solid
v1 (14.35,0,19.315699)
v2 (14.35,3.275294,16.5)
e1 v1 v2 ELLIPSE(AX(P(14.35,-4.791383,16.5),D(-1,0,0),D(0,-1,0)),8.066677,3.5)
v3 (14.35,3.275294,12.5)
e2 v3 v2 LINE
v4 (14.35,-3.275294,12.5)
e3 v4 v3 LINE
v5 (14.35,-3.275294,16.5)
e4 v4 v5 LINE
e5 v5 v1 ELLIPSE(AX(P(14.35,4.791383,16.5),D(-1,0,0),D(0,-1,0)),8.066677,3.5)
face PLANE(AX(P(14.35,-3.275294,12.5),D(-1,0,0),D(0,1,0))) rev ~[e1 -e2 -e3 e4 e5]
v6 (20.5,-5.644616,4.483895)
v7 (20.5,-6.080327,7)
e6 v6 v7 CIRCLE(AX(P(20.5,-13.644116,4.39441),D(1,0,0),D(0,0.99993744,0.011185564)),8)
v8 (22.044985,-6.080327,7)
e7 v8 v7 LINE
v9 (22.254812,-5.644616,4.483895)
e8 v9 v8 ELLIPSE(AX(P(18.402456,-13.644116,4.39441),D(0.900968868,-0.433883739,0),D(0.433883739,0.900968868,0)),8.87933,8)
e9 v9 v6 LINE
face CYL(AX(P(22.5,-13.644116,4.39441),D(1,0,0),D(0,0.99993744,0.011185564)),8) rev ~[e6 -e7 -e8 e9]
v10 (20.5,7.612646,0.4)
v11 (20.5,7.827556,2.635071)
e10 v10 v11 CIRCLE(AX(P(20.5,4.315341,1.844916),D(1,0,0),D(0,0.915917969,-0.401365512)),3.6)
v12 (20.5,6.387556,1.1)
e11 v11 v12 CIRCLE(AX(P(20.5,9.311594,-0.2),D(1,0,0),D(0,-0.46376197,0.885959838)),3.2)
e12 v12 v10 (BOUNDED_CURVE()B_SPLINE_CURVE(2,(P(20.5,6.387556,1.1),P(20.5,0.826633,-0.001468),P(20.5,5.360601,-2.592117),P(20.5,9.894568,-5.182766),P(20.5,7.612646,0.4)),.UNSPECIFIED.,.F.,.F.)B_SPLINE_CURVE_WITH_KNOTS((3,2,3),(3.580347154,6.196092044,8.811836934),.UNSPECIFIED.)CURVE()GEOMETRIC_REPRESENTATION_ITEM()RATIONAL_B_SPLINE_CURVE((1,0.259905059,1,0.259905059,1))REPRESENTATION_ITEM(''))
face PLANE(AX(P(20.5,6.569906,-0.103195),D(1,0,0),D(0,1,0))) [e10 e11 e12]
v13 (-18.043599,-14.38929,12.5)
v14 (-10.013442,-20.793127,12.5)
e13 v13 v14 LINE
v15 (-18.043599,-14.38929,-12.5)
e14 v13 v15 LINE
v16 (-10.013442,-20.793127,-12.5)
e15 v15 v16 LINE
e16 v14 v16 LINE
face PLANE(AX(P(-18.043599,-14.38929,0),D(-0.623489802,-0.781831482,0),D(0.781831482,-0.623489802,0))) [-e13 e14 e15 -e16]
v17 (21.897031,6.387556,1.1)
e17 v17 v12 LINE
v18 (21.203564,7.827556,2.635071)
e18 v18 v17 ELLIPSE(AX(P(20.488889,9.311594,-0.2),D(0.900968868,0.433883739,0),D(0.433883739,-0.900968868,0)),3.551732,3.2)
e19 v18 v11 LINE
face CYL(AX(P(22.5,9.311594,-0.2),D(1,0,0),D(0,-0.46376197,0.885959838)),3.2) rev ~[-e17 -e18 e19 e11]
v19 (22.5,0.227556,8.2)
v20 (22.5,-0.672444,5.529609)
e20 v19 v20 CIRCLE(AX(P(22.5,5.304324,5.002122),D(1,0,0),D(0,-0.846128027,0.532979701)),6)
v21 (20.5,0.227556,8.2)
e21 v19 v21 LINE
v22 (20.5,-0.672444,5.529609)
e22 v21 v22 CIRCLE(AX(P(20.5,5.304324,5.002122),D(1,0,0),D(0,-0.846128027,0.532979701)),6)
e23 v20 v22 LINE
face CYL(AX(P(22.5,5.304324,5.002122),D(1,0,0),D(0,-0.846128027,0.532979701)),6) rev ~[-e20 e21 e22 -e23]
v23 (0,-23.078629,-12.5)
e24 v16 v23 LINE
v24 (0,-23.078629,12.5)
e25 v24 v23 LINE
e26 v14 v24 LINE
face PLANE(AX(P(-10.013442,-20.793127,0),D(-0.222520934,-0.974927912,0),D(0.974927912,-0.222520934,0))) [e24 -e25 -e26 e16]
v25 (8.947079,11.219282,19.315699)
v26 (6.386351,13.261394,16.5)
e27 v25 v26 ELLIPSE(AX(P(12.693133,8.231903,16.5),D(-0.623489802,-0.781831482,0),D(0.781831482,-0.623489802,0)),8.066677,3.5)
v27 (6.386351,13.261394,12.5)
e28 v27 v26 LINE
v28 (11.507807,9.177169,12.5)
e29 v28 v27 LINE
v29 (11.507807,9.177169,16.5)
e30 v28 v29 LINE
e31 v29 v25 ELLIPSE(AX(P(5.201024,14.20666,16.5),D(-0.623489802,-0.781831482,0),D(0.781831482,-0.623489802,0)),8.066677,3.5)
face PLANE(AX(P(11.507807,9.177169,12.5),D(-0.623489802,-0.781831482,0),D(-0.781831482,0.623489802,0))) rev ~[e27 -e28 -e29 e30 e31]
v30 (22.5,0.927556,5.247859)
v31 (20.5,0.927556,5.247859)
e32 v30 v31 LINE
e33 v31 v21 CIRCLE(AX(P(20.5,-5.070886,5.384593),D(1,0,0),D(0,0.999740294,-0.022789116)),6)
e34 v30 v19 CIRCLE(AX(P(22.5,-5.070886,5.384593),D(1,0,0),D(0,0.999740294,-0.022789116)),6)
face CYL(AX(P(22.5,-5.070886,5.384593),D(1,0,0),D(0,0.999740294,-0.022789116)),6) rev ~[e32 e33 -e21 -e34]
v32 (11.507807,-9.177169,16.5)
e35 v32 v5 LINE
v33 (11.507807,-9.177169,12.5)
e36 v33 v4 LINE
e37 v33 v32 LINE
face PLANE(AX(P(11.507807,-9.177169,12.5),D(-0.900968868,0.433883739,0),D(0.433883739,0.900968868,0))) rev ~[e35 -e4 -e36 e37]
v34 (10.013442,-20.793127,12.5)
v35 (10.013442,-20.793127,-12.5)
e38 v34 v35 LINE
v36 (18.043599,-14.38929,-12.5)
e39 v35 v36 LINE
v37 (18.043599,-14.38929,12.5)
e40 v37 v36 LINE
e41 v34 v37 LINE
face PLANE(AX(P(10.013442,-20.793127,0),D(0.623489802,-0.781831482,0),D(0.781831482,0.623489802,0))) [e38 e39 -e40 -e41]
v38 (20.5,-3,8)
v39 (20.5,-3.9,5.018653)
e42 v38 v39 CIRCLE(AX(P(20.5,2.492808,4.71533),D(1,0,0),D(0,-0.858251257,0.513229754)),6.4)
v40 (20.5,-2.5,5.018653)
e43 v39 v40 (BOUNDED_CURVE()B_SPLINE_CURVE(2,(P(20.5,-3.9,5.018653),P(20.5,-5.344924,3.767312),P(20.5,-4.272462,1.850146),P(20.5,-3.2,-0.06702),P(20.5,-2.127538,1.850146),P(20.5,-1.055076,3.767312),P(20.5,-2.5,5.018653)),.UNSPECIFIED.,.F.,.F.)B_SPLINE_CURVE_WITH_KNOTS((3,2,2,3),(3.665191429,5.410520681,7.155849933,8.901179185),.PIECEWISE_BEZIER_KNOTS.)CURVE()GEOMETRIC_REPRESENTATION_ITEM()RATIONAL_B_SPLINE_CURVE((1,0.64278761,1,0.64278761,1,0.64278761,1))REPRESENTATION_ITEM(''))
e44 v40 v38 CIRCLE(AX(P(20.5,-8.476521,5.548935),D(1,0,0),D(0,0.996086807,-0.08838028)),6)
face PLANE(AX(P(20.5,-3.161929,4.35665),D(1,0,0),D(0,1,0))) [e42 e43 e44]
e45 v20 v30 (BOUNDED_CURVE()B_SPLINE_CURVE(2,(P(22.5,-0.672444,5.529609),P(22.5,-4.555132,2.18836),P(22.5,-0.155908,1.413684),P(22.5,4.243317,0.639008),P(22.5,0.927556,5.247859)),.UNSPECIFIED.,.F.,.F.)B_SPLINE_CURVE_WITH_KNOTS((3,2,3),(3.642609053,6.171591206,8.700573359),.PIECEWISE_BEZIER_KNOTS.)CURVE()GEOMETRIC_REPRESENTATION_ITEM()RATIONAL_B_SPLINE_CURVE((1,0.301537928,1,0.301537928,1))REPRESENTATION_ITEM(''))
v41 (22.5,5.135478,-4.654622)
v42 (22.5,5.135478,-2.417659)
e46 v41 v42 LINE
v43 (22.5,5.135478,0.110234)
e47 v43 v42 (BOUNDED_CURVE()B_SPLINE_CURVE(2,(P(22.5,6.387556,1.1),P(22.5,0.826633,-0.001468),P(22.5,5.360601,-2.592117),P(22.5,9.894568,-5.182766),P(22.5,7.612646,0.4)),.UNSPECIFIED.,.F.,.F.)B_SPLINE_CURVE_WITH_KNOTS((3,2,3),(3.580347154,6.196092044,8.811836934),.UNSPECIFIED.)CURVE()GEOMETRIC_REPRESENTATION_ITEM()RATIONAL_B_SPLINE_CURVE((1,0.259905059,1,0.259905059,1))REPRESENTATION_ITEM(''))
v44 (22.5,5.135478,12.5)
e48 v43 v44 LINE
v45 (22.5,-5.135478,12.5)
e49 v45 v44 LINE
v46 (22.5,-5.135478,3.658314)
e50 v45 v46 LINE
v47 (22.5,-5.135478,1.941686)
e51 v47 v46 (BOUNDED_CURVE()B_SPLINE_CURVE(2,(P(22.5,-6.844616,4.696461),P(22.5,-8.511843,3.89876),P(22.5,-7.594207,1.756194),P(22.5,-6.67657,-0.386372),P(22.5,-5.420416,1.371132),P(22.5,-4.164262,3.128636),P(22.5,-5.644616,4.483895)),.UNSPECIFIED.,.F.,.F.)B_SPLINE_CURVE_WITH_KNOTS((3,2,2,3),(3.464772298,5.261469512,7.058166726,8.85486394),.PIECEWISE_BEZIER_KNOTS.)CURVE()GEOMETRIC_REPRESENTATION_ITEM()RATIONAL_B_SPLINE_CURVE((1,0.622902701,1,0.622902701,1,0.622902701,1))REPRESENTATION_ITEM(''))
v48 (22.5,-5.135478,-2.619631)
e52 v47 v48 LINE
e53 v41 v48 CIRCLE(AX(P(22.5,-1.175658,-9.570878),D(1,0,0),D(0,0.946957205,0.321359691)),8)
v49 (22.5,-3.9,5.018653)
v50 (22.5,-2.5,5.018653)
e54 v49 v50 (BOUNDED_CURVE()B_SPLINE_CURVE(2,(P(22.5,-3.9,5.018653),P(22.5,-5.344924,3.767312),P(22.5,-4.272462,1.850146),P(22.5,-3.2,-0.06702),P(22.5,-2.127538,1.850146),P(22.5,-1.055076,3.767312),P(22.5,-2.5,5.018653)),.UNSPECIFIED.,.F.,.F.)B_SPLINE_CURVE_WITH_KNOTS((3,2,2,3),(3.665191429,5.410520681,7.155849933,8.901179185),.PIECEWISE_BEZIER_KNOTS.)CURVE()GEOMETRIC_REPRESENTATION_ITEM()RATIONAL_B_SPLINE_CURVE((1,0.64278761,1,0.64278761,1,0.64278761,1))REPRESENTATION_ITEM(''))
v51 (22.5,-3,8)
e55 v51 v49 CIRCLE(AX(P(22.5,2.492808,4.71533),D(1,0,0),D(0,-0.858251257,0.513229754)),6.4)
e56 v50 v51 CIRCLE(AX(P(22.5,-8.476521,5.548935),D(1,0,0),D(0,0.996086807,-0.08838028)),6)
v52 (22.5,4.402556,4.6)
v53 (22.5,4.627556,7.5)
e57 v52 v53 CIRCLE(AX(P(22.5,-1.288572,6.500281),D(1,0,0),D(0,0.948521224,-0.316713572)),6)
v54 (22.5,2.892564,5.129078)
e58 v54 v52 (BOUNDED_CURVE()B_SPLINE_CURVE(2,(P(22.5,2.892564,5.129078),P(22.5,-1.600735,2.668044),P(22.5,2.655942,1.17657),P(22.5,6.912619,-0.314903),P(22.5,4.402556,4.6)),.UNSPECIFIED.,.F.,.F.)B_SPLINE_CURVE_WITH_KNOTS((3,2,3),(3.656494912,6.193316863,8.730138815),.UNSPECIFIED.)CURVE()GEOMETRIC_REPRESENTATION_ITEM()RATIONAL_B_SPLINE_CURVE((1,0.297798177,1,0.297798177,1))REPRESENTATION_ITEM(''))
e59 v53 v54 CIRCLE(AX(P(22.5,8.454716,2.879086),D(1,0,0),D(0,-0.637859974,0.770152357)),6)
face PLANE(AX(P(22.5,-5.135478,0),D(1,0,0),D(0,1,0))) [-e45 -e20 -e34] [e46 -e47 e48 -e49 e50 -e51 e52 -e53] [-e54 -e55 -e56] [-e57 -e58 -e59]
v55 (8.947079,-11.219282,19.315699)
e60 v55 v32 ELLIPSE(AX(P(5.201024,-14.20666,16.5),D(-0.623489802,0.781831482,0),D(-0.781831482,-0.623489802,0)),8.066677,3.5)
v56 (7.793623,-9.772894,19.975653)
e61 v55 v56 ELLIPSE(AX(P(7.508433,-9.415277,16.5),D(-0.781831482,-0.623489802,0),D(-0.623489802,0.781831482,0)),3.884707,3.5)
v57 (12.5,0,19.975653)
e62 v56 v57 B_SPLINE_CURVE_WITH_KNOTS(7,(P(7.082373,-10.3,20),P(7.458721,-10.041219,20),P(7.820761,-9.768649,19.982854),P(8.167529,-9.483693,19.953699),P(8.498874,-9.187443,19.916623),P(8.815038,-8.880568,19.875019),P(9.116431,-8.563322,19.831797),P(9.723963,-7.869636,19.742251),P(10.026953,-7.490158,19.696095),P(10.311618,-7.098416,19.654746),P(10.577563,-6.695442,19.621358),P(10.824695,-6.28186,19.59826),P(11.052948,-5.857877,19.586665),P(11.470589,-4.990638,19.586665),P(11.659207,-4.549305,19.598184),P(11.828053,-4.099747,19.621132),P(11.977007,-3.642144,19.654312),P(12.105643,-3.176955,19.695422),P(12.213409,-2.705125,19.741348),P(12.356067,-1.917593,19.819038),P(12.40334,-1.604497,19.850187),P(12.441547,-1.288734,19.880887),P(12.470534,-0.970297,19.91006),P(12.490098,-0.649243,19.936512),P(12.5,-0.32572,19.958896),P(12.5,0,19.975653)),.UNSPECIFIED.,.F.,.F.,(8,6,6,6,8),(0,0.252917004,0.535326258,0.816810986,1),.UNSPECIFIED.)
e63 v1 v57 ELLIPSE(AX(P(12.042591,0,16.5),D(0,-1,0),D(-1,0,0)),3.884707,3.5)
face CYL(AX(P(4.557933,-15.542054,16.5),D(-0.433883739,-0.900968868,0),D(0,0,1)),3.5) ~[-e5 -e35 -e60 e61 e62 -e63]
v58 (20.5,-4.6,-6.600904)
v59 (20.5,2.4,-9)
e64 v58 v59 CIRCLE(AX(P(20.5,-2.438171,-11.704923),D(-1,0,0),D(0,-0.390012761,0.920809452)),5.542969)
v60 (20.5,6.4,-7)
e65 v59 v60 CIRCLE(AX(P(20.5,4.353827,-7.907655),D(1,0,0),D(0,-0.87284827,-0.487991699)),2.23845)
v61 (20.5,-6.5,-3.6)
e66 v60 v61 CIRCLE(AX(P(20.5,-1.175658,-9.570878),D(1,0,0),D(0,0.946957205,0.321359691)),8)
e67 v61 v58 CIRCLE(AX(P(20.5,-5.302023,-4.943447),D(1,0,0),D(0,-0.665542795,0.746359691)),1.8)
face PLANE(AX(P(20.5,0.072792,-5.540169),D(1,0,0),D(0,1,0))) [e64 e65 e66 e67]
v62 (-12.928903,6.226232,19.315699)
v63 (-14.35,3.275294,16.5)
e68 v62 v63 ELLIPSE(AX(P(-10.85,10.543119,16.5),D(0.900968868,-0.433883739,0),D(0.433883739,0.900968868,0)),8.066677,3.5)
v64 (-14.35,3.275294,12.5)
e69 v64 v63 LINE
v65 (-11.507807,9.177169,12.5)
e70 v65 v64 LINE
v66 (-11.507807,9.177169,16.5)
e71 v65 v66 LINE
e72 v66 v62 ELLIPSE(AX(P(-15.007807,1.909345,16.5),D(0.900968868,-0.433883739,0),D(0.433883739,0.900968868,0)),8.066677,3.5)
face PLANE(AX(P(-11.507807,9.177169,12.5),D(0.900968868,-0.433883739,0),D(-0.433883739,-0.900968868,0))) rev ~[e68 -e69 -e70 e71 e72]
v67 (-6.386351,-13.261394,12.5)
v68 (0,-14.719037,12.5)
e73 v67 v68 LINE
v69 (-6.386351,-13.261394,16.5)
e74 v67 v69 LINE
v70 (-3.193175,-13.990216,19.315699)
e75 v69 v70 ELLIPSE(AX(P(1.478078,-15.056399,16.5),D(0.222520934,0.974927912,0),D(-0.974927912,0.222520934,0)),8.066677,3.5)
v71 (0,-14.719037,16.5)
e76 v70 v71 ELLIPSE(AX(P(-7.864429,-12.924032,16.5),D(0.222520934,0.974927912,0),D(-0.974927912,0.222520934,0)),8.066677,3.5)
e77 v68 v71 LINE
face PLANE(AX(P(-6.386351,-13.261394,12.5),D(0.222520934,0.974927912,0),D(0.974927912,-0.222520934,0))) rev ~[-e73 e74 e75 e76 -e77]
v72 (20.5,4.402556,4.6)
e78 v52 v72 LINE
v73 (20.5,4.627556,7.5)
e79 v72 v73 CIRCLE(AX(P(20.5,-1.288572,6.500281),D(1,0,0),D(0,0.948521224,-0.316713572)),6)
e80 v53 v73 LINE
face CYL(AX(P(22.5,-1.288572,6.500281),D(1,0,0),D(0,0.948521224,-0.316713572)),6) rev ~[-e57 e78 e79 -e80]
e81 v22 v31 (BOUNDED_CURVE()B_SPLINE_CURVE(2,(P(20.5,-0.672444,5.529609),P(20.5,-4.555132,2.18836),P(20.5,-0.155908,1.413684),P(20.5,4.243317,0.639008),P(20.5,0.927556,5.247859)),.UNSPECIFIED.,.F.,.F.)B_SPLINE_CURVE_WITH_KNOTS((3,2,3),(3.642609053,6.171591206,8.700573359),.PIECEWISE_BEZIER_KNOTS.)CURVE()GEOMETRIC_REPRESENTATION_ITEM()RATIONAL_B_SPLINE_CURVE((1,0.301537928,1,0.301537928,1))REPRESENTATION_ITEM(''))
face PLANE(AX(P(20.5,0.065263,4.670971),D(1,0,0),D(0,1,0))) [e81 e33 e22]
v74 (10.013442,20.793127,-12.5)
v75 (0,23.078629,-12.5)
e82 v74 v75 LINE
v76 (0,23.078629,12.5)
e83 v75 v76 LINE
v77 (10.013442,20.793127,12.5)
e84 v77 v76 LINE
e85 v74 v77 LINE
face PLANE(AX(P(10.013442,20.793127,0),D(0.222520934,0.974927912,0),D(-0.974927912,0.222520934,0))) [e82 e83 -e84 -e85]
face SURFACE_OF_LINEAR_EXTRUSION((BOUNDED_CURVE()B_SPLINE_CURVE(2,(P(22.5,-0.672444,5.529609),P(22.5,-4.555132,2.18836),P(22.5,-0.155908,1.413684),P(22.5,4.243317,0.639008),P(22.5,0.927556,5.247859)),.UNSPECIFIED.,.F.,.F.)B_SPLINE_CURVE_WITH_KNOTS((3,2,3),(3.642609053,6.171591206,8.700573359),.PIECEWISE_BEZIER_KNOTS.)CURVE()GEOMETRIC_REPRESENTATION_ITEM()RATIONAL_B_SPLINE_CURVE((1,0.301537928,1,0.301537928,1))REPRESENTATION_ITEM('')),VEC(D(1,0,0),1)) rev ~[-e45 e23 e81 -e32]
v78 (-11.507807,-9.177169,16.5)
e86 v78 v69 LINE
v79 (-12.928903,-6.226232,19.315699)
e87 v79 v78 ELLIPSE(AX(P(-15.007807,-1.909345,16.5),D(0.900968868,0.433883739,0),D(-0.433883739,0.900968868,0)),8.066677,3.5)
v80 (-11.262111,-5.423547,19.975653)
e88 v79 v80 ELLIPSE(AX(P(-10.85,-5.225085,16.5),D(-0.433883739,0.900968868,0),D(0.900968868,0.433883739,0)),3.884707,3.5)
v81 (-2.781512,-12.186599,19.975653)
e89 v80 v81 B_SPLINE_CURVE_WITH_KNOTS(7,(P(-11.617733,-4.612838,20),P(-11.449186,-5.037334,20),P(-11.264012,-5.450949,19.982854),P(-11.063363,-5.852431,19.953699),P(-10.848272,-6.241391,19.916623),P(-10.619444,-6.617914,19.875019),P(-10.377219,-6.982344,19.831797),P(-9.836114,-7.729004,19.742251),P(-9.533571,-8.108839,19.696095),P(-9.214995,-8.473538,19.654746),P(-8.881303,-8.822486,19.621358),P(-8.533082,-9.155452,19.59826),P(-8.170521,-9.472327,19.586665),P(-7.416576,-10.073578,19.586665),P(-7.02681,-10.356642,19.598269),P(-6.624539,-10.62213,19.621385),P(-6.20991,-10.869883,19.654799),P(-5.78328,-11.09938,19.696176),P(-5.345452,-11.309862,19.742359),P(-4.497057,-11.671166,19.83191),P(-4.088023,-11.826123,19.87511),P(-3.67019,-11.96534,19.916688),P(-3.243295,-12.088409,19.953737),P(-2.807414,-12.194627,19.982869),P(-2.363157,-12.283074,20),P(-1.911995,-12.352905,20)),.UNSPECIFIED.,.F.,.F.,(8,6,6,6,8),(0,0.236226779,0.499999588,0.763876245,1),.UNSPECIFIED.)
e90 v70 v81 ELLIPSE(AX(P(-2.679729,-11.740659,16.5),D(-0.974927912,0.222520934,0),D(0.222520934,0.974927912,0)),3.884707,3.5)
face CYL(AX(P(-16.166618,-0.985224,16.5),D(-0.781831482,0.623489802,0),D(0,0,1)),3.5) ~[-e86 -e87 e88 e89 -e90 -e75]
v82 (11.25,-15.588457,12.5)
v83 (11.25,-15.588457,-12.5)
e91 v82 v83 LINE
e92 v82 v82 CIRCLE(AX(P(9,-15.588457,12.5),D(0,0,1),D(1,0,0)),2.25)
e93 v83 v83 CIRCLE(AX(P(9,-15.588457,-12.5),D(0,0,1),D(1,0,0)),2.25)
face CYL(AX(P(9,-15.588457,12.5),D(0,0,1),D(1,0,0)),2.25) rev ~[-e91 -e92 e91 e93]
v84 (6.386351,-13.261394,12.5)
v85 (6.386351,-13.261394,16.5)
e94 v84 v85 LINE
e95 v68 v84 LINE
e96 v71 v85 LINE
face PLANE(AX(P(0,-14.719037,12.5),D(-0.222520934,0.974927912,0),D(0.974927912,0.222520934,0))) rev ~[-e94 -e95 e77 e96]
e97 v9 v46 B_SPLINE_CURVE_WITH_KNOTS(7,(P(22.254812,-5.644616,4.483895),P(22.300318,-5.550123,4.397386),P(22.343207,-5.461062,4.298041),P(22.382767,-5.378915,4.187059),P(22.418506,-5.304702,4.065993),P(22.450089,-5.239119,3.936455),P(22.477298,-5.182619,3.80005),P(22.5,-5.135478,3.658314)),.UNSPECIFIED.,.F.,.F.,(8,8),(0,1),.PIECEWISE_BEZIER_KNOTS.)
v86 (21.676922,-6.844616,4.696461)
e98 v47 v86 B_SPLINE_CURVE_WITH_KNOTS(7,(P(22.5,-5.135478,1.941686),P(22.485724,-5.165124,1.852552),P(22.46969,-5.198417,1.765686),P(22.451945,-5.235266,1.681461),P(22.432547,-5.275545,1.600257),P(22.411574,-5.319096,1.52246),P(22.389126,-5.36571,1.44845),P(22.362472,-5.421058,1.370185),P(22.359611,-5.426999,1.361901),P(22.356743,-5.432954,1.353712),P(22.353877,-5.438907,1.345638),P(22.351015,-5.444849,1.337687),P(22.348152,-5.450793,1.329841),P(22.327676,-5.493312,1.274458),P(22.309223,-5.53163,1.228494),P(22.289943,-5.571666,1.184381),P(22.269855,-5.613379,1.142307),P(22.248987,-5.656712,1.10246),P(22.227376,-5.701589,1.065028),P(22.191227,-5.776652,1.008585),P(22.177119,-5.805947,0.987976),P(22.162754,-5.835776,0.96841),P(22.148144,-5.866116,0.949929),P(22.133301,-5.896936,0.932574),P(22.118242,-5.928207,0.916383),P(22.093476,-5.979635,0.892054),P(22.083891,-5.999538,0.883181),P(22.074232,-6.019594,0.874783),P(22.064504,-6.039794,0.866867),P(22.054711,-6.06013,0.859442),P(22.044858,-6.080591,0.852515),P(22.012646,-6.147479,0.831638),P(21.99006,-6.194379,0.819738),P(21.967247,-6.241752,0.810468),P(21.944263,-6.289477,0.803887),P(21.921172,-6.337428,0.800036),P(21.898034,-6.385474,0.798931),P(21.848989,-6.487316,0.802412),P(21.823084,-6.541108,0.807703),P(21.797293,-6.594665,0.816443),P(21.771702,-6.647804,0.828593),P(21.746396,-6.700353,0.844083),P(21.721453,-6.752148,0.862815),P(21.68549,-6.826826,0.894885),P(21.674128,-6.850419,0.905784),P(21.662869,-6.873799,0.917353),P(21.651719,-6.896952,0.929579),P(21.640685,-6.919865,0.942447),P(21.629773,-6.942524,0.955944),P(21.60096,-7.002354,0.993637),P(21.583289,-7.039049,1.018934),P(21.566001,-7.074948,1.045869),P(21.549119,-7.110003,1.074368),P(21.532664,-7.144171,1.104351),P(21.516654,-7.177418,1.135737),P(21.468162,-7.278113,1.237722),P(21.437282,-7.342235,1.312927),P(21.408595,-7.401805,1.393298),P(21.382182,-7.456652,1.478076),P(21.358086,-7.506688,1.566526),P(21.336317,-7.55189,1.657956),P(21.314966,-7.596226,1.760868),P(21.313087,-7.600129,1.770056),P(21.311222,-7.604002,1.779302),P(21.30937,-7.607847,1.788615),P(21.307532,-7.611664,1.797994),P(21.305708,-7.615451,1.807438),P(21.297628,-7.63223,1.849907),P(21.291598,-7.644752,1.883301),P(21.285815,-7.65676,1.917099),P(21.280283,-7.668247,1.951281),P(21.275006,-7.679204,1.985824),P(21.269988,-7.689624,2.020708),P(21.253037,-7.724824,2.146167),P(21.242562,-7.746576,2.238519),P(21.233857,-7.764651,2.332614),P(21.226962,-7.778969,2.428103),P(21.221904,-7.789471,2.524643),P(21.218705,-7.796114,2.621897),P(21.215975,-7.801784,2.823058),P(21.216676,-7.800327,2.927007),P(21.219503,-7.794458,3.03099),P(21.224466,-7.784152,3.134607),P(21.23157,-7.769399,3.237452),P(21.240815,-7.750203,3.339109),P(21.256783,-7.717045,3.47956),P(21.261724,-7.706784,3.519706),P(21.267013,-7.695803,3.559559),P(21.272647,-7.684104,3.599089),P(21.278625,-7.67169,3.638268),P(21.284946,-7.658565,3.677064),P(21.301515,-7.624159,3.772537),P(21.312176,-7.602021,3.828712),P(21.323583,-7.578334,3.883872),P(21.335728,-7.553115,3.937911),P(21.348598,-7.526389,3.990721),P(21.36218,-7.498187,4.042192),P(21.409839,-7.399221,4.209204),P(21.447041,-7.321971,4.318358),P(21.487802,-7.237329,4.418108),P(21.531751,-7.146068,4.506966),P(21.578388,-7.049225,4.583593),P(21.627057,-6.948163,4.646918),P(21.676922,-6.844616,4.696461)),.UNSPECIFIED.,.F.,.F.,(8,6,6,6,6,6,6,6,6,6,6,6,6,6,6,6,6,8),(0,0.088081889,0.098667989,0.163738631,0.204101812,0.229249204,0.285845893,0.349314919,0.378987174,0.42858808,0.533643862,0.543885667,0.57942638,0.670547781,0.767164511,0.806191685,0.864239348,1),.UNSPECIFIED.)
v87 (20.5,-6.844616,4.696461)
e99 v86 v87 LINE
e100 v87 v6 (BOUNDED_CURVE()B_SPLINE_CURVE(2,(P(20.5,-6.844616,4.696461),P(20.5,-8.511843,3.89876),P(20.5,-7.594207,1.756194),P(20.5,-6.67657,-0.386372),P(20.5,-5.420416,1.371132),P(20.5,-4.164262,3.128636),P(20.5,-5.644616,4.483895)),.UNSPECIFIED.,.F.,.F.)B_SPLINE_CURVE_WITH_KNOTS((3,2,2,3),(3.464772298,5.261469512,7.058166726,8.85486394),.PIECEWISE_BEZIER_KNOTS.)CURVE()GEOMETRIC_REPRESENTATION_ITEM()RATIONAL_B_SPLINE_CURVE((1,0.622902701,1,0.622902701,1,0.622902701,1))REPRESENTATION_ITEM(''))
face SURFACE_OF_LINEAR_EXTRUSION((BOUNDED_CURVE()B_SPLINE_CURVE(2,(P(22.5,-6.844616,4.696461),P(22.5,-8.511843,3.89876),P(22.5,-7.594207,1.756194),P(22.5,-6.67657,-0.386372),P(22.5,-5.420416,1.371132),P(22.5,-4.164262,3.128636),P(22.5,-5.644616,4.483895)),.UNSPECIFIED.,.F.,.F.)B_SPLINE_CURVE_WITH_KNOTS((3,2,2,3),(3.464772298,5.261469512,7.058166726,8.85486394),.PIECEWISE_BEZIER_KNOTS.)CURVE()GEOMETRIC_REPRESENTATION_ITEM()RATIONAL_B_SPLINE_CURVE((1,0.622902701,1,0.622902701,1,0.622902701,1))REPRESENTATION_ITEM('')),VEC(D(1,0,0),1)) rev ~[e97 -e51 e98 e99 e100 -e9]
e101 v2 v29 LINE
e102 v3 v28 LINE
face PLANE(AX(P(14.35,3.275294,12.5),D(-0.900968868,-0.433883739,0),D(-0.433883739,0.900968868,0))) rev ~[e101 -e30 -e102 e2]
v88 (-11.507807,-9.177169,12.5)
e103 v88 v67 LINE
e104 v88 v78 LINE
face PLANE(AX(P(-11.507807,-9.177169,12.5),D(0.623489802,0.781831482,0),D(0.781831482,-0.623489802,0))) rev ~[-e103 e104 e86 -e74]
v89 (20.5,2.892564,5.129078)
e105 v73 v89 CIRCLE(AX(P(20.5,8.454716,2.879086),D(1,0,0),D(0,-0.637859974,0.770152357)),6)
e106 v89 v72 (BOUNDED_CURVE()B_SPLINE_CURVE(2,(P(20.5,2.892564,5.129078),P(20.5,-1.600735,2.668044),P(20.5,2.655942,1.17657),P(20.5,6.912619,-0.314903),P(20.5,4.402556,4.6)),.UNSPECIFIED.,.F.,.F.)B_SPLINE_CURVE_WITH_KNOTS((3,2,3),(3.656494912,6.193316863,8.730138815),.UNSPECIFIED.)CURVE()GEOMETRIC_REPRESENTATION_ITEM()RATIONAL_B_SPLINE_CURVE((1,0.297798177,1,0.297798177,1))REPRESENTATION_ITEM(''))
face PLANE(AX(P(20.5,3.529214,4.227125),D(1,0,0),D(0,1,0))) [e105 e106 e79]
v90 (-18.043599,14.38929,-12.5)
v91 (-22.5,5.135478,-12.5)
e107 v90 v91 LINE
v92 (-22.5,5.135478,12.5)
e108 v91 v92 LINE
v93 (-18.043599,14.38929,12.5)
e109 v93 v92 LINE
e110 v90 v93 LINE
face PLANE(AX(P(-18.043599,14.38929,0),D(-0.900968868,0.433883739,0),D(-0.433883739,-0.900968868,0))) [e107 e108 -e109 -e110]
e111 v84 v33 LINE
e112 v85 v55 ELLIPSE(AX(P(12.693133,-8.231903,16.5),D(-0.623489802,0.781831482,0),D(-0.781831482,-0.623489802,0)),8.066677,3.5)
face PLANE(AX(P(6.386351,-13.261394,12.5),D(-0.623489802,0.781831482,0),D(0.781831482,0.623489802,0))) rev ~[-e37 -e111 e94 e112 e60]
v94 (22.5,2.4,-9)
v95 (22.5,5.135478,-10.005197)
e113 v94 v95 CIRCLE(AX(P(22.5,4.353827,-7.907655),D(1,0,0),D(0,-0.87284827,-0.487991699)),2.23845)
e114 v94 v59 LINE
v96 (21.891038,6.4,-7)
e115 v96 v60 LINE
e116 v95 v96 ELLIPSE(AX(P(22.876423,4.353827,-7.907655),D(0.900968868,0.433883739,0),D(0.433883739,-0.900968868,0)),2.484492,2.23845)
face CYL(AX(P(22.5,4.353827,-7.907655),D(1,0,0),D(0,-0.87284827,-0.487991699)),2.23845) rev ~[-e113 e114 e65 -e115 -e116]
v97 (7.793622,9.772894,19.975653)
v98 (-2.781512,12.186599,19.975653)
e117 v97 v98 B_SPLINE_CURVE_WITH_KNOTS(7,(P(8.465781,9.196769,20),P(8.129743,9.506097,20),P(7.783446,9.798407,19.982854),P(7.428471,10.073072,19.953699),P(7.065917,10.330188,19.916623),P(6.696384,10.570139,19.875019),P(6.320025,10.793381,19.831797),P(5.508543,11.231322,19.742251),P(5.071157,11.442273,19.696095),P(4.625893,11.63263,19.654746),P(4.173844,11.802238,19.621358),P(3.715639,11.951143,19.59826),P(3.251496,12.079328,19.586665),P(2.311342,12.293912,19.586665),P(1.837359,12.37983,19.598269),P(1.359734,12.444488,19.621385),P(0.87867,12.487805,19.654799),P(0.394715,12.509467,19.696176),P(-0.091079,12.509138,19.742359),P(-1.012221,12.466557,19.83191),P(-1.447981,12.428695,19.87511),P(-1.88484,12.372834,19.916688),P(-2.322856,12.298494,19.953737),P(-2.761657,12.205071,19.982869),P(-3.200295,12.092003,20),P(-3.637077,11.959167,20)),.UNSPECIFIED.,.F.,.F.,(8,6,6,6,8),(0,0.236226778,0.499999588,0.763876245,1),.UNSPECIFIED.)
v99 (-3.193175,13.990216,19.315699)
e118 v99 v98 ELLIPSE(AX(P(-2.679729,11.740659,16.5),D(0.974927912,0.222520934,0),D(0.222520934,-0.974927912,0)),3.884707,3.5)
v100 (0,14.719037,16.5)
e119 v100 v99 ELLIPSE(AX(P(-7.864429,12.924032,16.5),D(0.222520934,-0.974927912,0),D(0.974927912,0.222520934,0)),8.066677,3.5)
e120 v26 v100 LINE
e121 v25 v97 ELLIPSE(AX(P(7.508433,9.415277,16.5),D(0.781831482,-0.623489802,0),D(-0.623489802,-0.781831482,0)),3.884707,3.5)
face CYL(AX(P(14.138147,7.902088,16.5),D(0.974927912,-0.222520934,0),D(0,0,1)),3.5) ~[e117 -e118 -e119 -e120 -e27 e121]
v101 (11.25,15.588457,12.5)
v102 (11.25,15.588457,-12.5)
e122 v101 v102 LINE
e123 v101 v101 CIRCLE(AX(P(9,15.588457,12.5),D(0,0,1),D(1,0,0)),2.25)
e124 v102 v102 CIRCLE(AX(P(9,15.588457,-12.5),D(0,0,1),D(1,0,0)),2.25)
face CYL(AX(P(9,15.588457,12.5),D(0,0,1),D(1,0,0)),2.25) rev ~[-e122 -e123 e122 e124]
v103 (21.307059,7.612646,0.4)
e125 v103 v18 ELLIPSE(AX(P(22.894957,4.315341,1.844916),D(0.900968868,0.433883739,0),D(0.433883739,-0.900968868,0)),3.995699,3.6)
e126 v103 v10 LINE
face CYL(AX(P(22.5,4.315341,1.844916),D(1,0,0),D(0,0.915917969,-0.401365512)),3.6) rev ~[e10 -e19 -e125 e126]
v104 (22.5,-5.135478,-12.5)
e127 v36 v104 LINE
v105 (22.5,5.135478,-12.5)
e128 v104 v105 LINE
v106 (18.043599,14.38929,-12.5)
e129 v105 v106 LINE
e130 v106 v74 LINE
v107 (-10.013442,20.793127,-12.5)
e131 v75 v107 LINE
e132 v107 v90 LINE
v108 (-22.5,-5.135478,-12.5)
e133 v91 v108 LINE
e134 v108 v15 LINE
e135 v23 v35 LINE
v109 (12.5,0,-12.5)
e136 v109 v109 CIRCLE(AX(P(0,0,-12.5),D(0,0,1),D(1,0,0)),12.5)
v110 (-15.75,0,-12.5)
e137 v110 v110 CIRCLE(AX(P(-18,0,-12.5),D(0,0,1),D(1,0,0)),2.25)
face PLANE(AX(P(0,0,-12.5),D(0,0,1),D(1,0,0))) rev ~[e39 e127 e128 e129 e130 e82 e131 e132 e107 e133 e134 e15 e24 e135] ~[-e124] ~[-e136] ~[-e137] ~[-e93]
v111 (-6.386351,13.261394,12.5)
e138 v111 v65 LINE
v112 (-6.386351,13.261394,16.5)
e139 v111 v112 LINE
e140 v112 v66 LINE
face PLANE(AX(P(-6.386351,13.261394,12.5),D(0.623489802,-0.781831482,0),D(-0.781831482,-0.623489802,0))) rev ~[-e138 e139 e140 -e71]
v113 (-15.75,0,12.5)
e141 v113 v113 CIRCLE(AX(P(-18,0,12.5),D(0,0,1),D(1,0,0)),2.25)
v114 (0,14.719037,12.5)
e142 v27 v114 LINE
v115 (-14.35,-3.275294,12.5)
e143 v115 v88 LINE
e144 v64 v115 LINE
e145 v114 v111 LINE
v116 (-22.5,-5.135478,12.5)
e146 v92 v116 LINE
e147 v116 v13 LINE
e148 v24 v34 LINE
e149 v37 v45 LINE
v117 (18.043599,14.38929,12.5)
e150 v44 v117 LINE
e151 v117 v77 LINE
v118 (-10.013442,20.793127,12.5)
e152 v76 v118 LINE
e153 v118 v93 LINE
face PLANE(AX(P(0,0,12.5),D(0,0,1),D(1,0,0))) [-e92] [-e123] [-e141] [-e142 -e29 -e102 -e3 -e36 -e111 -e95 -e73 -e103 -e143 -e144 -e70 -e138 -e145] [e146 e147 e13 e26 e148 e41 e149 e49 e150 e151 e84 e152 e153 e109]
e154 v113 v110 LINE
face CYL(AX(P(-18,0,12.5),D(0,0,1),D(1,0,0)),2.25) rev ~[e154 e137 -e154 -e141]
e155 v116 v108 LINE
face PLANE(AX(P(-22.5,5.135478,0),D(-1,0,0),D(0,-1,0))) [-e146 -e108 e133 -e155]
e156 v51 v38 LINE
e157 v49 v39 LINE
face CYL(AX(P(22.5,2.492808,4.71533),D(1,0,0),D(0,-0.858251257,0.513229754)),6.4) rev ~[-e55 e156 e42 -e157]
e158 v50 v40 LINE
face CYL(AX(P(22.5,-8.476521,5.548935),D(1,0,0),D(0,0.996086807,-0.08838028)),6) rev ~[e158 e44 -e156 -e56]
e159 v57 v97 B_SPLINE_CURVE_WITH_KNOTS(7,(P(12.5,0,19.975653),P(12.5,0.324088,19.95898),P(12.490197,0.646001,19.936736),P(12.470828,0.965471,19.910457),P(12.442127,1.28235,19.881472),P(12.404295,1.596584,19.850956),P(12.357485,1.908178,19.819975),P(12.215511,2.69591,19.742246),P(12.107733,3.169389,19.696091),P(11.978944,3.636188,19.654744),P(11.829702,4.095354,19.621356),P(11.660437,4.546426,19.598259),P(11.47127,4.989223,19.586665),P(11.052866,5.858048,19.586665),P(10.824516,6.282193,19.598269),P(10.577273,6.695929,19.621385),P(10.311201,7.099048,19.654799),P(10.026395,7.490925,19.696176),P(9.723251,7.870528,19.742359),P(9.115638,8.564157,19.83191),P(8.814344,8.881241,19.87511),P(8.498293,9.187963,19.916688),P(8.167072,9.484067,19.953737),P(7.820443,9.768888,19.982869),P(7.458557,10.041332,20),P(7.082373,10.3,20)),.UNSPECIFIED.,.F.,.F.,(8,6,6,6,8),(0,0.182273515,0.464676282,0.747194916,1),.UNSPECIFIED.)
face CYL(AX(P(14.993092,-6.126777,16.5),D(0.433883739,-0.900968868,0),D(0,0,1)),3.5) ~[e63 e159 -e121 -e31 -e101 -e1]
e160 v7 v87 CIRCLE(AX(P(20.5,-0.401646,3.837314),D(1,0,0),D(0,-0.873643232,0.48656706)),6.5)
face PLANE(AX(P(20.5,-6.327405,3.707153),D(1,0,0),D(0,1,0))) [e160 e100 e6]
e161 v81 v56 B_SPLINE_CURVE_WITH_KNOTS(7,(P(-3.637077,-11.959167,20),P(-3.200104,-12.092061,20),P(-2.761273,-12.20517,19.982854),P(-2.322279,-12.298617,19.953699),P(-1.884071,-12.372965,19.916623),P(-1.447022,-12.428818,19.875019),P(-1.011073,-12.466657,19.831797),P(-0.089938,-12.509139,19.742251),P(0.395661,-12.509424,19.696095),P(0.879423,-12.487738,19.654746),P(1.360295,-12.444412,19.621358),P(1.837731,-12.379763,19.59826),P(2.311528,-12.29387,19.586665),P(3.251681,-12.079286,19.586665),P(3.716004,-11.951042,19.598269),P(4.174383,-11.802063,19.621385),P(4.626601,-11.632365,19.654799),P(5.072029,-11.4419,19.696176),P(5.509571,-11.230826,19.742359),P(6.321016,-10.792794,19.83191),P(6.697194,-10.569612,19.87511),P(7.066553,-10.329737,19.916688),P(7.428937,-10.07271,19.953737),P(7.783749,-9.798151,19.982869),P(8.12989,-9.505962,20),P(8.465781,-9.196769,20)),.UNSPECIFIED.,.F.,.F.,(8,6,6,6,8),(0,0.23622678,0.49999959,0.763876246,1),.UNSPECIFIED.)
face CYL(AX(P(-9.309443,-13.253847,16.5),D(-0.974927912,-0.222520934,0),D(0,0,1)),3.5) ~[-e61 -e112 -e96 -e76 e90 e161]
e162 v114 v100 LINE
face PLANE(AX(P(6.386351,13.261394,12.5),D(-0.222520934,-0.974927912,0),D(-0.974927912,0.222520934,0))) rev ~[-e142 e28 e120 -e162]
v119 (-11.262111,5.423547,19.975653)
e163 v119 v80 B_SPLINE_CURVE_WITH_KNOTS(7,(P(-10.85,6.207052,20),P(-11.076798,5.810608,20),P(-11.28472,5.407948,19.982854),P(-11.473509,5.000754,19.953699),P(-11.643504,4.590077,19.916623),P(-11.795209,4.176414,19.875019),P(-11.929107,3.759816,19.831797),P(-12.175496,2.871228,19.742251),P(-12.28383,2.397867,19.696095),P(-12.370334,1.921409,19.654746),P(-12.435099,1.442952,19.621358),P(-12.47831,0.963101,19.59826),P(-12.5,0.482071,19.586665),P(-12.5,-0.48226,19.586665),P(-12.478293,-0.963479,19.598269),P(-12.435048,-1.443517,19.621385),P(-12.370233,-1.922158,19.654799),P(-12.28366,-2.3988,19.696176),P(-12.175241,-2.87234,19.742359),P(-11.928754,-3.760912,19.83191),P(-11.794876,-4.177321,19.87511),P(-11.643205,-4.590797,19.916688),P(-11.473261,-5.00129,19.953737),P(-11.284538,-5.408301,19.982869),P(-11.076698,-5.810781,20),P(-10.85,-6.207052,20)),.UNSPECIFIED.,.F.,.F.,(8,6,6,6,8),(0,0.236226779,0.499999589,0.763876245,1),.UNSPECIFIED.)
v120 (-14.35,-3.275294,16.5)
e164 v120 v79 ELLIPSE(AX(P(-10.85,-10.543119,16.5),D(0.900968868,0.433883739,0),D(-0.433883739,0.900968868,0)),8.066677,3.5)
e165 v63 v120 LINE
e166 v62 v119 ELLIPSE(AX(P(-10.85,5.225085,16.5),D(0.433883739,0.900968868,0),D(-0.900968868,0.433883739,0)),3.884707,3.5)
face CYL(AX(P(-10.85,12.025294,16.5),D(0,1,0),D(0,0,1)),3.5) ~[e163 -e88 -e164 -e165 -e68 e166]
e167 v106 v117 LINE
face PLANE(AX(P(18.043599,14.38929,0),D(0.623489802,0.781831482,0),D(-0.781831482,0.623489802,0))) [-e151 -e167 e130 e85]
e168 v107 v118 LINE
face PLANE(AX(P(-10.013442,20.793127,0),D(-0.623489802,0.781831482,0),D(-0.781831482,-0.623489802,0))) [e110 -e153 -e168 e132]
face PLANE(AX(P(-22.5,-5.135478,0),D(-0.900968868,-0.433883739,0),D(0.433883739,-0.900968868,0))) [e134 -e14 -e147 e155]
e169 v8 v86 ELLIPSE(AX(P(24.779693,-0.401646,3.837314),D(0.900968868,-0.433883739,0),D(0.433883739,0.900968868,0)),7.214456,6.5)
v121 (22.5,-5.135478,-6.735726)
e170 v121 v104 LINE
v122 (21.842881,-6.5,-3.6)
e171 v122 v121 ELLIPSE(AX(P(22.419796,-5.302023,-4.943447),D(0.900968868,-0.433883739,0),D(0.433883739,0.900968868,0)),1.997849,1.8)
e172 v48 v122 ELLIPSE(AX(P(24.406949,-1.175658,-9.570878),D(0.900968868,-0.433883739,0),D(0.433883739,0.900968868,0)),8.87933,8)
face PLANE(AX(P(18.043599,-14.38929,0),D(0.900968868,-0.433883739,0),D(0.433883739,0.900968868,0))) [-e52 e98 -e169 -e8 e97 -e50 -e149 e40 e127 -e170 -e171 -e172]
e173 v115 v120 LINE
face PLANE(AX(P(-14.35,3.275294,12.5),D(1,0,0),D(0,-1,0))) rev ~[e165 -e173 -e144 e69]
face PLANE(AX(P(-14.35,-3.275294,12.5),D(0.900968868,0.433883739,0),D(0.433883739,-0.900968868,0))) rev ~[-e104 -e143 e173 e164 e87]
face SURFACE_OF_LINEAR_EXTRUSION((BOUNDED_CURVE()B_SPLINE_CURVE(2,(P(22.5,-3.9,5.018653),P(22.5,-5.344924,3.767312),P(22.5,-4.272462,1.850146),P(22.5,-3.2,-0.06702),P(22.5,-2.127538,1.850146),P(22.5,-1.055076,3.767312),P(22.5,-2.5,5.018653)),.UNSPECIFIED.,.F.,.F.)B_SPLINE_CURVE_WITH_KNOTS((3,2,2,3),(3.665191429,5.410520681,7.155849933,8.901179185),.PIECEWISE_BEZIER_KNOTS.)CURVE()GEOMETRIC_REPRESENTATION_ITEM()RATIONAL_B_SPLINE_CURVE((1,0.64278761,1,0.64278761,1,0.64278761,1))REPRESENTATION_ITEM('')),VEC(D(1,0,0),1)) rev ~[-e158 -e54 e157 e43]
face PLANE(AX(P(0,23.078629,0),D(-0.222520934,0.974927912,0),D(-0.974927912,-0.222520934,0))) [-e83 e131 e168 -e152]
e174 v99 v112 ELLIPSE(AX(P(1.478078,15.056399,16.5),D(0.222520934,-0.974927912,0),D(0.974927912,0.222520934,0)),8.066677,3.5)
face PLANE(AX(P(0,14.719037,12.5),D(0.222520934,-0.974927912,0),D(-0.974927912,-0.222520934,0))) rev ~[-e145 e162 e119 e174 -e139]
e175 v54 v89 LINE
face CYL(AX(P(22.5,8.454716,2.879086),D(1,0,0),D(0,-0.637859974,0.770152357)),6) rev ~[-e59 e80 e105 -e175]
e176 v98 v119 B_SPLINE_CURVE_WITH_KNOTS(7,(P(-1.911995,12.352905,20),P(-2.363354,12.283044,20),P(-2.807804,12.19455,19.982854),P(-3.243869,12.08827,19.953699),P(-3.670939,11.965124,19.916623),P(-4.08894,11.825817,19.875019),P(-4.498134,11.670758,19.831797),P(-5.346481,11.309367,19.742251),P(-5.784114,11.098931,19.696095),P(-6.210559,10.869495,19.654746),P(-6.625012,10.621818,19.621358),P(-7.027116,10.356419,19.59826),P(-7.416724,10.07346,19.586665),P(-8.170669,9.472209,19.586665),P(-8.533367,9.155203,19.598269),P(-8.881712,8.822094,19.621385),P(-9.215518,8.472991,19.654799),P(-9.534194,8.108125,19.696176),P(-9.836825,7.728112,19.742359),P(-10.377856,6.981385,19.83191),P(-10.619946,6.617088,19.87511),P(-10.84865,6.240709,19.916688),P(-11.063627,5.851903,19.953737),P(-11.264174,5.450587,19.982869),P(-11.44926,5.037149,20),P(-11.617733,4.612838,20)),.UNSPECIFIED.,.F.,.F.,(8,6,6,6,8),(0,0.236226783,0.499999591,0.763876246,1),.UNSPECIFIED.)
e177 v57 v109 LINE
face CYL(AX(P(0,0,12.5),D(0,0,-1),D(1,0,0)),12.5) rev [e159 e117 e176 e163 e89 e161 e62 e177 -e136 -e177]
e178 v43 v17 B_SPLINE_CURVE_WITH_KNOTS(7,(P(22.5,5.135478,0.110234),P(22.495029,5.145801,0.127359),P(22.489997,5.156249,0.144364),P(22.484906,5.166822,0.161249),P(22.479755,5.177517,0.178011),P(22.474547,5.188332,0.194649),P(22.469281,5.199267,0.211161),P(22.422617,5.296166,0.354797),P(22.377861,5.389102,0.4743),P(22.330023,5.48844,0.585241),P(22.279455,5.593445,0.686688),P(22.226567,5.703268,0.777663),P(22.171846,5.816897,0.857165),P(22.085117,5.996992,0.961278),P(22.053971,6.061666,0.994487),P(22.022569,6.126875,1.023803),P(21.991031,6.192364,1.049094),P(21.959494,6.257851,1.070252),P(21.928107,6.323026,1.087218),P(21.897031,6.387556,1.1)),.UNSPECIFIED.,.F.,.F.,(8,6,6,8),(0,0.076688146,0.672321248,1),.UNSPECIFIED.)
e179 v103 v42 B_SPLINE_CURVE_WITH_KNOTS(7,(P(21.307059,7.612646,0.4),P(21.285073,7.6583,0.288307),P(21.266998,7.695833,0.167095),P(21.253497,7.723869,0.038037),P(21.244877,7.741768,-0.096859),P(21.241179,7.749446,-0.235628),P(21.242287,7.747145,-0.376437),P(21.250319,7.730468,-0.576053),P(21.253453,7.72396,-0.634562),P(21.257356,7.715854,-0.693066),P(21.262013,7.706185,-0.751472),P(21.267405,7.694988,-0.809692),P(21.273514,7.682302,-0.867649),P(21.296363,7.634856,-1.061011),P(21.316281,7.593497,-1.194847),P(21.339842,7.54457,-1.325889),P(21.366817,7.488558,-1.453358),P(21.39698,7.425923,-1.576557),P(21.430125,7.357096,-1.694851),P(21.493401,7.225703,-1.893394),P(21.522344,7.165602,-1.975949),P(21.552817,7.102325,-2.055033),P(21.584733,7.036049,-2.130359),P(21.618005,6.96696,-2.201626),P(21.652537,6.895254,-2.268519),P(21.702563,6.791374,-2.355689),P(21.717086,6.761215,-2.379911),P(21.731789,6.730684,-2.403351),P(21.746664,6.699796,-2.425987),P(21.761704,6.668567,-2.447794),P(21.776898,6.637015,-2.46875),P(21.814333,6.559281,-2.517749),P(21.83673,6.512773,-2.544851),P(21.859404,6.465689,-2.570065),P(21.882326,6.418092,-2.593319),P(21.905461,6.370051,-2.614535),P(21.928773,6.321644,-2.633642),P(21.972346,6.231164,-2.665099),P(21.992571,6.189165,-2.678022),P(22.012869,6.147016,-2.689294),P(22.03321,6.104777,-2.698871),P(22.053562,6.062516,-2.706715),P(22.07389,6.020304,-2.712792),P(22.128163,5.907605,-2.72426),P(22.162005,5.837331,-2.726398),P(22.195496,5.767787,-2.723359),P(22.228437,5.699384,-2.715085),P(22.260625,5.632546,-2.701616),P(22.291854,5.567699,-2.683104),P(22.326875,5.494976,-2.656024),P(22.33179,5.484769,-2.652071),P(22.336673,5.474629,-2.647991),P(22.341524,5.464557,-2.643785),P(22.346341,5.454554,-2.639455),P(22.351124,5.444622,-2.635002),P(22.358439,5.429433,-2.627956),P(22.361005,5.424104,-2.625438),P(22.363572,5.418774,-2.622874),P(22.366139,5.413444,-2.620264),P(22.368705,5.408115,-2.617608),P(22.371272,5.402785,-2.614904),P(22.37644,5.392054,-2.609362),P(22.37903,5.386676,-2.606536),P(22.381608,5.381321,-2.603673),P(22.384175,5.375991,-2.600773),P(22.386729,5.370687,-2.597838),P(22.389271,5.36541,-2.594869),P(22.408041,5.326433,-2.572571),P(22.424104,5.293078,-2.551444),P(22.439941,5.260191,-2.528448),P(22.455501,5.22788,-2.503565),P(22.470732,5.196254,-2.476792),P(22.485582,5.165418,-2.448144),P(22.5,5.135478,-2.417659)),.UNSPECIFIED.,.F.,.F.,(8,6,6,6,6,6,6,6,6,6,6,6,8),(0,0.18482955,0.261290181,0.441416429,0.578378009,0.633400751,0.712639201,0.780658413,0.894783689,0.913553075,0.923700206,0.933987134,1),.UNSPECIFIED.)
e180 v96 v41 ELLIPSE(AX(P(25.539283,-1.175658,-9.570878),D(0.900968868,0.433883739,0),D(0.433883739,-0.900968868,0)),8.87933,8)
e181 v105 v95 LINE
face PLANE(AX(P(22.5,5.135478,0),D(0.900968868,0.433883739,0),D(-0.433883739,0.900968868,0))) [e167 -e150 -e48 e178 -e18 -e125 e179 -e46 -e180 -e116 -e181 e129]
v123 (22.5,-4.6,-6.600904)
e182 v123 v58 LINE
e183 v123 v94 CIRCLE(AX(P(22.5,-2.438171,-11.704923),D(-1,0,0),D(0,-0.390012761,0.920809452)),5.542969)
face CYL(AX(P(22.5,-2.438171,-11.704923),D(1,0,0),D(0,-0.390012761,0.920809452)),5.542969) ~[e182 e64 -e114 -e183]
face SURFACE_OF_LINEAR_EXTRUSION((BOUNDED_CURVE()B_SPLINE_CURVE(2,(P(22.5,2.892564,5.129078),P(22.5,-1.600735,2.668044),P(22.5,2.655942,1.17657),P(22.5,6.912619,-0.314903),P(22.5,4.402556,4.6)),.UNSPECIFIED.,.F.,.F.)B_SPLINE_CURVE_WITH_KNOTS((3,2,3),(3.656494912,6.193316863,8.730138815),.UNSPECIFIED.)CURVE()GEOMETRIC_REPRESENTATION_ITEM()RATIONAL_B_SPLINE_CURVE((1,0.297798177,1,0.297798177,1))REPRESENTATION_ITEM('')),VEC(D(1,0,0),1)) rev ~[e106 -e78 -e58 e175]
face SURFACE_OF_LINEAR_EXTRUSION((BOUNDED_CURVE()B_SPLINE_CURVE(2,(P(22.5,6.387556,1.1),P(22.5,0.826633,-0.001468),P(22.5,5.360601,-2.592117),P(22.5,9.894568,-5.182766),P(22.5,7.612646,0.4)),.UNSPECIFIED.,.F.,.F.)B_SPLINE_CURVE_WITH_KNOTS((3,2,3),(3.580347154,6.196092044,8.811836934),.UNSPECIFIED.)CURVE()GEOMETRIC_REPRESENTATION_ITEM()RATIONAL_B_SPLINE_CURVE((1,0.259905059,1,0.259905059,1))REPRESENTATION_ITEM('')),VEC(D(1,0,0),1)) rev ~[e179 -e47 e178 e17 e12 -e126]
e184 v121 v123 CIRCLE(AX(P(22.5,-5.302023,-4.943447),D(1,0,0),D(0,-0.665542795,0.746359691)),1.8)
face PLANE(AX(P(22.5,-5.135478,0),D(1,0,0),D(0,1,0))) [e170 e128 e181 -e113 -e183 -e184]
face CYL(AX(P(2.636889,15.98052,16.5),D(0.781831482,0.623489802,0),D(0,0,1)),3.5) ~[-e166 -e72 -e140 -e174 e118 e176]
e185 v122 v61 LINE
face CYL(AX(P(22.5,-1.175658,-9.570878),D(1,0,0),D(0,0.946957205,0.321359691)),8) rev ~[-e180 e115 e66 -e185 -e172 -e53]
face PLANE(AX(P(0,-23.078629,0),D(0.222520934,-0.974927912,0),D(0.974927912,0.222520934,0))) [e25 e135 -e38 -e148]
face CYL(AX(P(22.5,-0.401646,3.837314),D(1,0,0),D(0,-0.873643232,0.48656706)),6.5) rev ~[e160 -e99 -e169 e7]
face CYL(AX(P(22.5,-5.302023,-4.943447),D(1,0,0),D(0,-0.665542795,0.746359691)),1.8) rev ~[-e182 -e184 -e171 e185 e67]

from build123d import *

# Parameters (mm, degrees)
F0_R         = 12.5
F1_DEPTH     = 12.5
F2_R         = 2.25
F3_DEPTH     = 25
F4_R         = 12.5
F5_DEPTH     = 7.5
F6_T1_DEPTH  = 24.050587715
F6_T3_DEPTH  = 24.050587715
F6_T5_DEPTH  = 24.050587715
F6_T7_DEPTH  = 24.050587715
F6_T9_DEPTH  = 24.050587715
F6_T11_DEPTH = 24.050587715
F6_T13_DEPTH = 24.050587715
F8_DEPTH     = 2


# Not quite as in the source:
# - a fillet or chamfer that OpenCascade refuses, or shapes differently, is made with other operations: its cross-section is extruded or revolved along the edge and cut away or added


with BuildPart() as f1:
    # F0 (on Top) → F1 (new body, symmetric)
    with BuildSketch(Plane.XY):
        Polygon((22.5, -5.1354781738), (22.5, 5.1354781738), (18.0435990556, 14.3892900865), (10.013442028, 20.7931266245), (0, 23.0786294236), (-10.013442028, 20.7931266245), (-18.0435990556, 14.3892900865), (-22.5, 5.1354781738), (-22.5, -5.1354781738), (-18.0435990556, -14.3892900865), (-10.013442028, -20.7931266245), (0, -23.0786294236), (10.013442028, -20.7931266245), (18.0435990556, -14.3892900865), align=None)
        Circle(F0_R, mode=Mode.SUBTRACT)
    extrude(amount=F1_DEPTH, both=True)

    # F2 (on face) → F3 (cut)
    with BuildSketch(Plane.XY.offset(12.5)):
        with Locations((9, 15.5884572681)):
            Circle(F2_R)
        with Locations((-18, 0)):
            Circle(F2_R)
        with Locations((9, -15.5884572681)):
            Circle(F2_R)
    extrude(amount=-F3_DEPTH, mode=Mode.SUBTRACT)

    # F4 (on face) → F5 (join)
    with BuildSketch(Plane.XY.offset(12.5)):
        Polygon((14.35, -3.2752938575), (14.35, 3.2752938575), (11.5078065088, 9.1771694552), (6.3863508045, 13.2613940917), (0, 14.719036988), (-6.3863508045, 13.2613940917), (-11.5078065088, 9.1771694552), (-14.35, 3.2752938575), (-14.35, -3.2752938575), (-11.5078065088, -9.1771694552), (-6.3863508045, -13.2613940917), (0, -14.719036988), (6.3863508045, -13.2613940917), (11.5078065088, -9.1771694552), align=None)
        Circle(F4_R, mode=Mode.SUBTRACT)
    extrude(amount=F5_DEPTH)

    # F6: fillet of radius 3.5 on 7 edges, made by hand

    # F6_s2 → F6_t1 (cut)
    with BuildSketch(Plane.XZ.offset(-12.0252938575)):
        with BuildLine():
            ThreePointArc((-10.85, 20), (-13.3248737342, 18.9748737342), (-14.35, 16.5))
            Line((-14.35, 16.5), (-14.35, 20))
            Line((-14.35, 20), (-10.85, 20))
        make_face()
    extrude(amount=F6_T1_DEPTH, mode=Mode.SUBTRACT)

    # F6_s4 → F6_t3 (cut)
    with BuildSketch(Plane(origin=(-9.4017533237, 7.4976480845, 0), x_dir=(0, 0, 1), z_dir=(0.7818314825, -0.6234898019, 0))):
        with BuildLine():
            ThreePointArc((20, 10.85), (18.9748737342, 13.3248737342), (16.5, 14.35))
            Line((16.5, 14.35), (20, 14.35))
            Line((20, 14.35), (20, 10.85))
        make_face()
    extrude(amount=F6_T3_DEPTH, mode=Mode.SUBTRACT)

    # F6_s6 → F6_t5 (cut)
    with BuildSketch(Plane(origin=(-11.7237946339, -2.6758796203, 0), x_dir=(0, 0, 1), z_dir=(0.9749279122, 0.222520934, 0))):
        with BuildLine():
            ThreePointArc((20, 10.85), (18.9748737342, 13.3248737342), (16.5, 14.35))
            Line((16.5, 14.35), (20, 14.35))
            Line((20, 14.35), (20, 10.85))
        make_face()
    extrude(amount=F6_T5_DEPTH, mode=Mode.SUBTRACT)

    # F6_s8 → F6_t7 (cut)
    with BuildSketch(Plane(origin=(-5.2175794629, -10.834415393, 0), x_dir=(0, 0, 1), z_dir=(0.4338837391, 0.9009688679, 0))):
        with BuildLine():
            ThreePointArc((20, 10.85), (18.9748737342, 13.3248737342), (16.5, 14.35))
            Line((16.5, 14.35), (20, 14.35))
            Line((20, 14.35), (20, 10.85))
        make_face()
    extrude(amount=F6_T7_DEPTH, mode=Mode.SUBTRACT)

    # F6_s10 → F6_t9 (cut)
    with BuildSketch(Plane(origin=(5.2175794629, -10.834415393, 0), x_dir=(0, 0, 1), z_dir=(-0.4338837391, 0.9009688679, 0))):
        with BuildLine():
            ThreePointArc((20, 10.85), (18.9748737342, 13.3248737342), (16.5, 14.35))
            Line((16.5, 14.35), (20, 14.35))
            Line((20, 14.35), (20, 10.85))
        make_face()
    extrude(amount=F6_T9_DEPTH, mode=Mode.SUBTRACT)

    # F6_s12 → F6_t11 (cut)
    with BuildSketch(Plane(origin=(11.7237946339, -2.6758796203, 0), x_dir=(0, 0, 1), z_dir=(-0.9749279122, 0.222520934, 0))):
        with BuildLine():
            ThreePointArc((20, 10.85), (18.9748737342, 13.3248737342), (16.5, 14.35))
            Line((16.5, 14.35), (20, 14.35))
            Line((20, 14.35), (20, 10.85))
        make_face()
    extrude(amount=F6_T11_DEPTH, mode=Mode.SUBTRACT)

    # F6_s14 → F6_t13 (cut)
    with BuildSketch(Plane(origin=(9.4017533237, 7.4976480845, 0), x_dir=(0, 0, 1), z_dir=(-0.7818314825, -0.6234898019, 0))):
        with BuildLine():
            ThreePointArc((20, 10.85), (18.9748737342, 13.3248737342), (16.5, 14.35))
            Line((16.5, 14.35), (20, 14.35))
            Line((20, 14.35), (20, 10.85))
        make_face()
    extrude(amount=F6_T13_DEPTH, mode=Mode.SUBTRACT)

    # F7 (on face) → F8 (cut)
    with BuildSketch(Plane.YZ.offset(22.5)):
        with BuildLine():
            ThreePointArc((-6.08032713, 7), (-6.5709395266, 5.8842188275), (-6.8446164746, 4.6964608232))
            add(Edge.make_bspline(
                [(-6.8446164746, 4.6964608232), (-8.5118431653, 3.8987596156), (-7.5942066586, 1.756193723), (-6.676570152, -0.3863721695), (-5.4204160797, 1.3711319286), (-4.1642620074, 3.1286360267), (-5.6446164746, 4.4838947381)],
                knots=[3.4647722977, 3.4647722977, 3.4647722977, 5.2614695117, 5.2614695117, 7.0581667257, 7.0581667257, 8.8548639397, 8.8548639397, 8.8548639397], degree=2, weights=[1, 0.6229027007, 1, 0.6229027007, 1, 0.6229027007, 1]))
            ThreePointArc((-5.6446164746, 4.4838947381), (-5.761433535, 5.7594440336), (-6.08032713, 7))
        make_face()
        with BuildLine():
            ThreePointArc((-3, 8), (-3.6341058947, 6.5649040102), (-3.9, 5.0186533479))
            add(Edge.make_bspline(
                [(-3.9, 5.0186533479), (-5.3449244407, 3.7673120757), (-4.2724622204, 1.8501460197), (-3.2, -0.0670200364), (-2.1275377796, 1.8501460197), (-1.0550755593, 3.7673120757), (-2.5, 5.0186533479)],
                knots=[3.6651914292, 3.6651914292, 3.6651914292, 5.4105206812, 5.4105206812, 7.1558499332, 7.1558499332, 8.9011791852, 8.9011791852, 8.9011791852], degree=2, weights=[1, 0.6427876097, 1, 0.6427876097, 1, 0.6427876097, 1]))
            ThreePointArc((-2.5, 5.0186533479), (-2.5591609645, 6.5413321832), (-3, 8))
        make_face()
        with BuildLine():
            ThreePointArc((0.2275558291, 8.2), (-0.3814401497, 6.9183905981), (-0.6724441709, 5.5296086062))
            add(Edge.make_bspline(
                [(-0.6724441709, 5.5296086062), (-4.5551319088, 2.1883602337), (-0.1559076785, 1.4136843578), (4.2433165517, 0.6390084818), (0.9275558291, 5.247858612)],
                knots=[3.6426090527, 3.6426090527, 3.6426090527, 6.1715912058, 6.1715912058, 8.7005733589, 8.7005733589, 8.7005733589], degree=2, weights=[1, 0.301537928, 1, 0.301537928, 1]))
            ThreePointArc((0.9275558291, 5.247858612), (0.7672369702, 6.7689057422), (0.2275558291, 8.2))
        make_face()
        with BuildLine():
            ThreePointArc((4.6275558291, 7.5), (3.6127003085, 6.4223734822), (2.8925635541, 5.1290778105))
            add(Edge.make_bspline(
                [(2.8925635541, 5.1290778105), (-1.6007345704, 2.6680437483), (2.6559421174, 1.1765704347), (6.9126188052, -0.3149028789), (4.4025558291, 4.6)],
                knots=[3.6564949123, 3.6564949123, 3.6564949123, 6.1933168635, 6.1933168635, 8.7301388146, 8.7301388146, 8.7301388146], degree=2, weights=[1, 0.2977981768, 1, 0.2977981768, 1]))
            ThreePointArc((4.4025558291, 4.6), (4.6934507475, 6.036159015), (4.6275558291, 7.5))
        make_face()
        with BuildLine():
            ThreePointArc((7.8275558291, 2.635071483), (6.9777355341, 1.9893158846), (6.3875558291, 1.1))
            add(Edge.make_bspline(
                [(6.3875558291, 1.1), (0.8266327144, -0.0014683083), (5.3606005397, -2.5921173467), (9.8945683651, -5.182766385), (7.6126455386, 0.4)],
                knots=[3.5803471544, 3.5803471544, 3.5803471544, 6.1960920441, 6.1960920441, 8.8118369337, 8.8118369337, 8.8118369337], degree=2, weights=[1, 0.2599050592, 1, 0.2599050592, 1]))
            ThreePointArc((7.6126455386, 0.4), (7.89881342, 1.5003518589), (7.8275558291, 2.635071483))
        make_face()
        with BuildLine():
            ThreePointArc((2.4, -9), (5.354892815, -9.90978563), (6.4, -7))
            ThreePointArc((6.4, -7), (0.8632403752, -1.8350585765), (-6.5, -3.6))
            ThreePointArc((-6.5, -3.6), (-6.8228285121, -5.9063339911), (-4.6, -6.6009044571))
            ThreePointArc((-4.6, -6.6009044571), (-0.6410576804, -6.4613658189), (2.4, -9))
        make_face()
    extrude(amount=-F8_DEPTH, mode=Mode.SUBTRACT)


solid = f1.part
